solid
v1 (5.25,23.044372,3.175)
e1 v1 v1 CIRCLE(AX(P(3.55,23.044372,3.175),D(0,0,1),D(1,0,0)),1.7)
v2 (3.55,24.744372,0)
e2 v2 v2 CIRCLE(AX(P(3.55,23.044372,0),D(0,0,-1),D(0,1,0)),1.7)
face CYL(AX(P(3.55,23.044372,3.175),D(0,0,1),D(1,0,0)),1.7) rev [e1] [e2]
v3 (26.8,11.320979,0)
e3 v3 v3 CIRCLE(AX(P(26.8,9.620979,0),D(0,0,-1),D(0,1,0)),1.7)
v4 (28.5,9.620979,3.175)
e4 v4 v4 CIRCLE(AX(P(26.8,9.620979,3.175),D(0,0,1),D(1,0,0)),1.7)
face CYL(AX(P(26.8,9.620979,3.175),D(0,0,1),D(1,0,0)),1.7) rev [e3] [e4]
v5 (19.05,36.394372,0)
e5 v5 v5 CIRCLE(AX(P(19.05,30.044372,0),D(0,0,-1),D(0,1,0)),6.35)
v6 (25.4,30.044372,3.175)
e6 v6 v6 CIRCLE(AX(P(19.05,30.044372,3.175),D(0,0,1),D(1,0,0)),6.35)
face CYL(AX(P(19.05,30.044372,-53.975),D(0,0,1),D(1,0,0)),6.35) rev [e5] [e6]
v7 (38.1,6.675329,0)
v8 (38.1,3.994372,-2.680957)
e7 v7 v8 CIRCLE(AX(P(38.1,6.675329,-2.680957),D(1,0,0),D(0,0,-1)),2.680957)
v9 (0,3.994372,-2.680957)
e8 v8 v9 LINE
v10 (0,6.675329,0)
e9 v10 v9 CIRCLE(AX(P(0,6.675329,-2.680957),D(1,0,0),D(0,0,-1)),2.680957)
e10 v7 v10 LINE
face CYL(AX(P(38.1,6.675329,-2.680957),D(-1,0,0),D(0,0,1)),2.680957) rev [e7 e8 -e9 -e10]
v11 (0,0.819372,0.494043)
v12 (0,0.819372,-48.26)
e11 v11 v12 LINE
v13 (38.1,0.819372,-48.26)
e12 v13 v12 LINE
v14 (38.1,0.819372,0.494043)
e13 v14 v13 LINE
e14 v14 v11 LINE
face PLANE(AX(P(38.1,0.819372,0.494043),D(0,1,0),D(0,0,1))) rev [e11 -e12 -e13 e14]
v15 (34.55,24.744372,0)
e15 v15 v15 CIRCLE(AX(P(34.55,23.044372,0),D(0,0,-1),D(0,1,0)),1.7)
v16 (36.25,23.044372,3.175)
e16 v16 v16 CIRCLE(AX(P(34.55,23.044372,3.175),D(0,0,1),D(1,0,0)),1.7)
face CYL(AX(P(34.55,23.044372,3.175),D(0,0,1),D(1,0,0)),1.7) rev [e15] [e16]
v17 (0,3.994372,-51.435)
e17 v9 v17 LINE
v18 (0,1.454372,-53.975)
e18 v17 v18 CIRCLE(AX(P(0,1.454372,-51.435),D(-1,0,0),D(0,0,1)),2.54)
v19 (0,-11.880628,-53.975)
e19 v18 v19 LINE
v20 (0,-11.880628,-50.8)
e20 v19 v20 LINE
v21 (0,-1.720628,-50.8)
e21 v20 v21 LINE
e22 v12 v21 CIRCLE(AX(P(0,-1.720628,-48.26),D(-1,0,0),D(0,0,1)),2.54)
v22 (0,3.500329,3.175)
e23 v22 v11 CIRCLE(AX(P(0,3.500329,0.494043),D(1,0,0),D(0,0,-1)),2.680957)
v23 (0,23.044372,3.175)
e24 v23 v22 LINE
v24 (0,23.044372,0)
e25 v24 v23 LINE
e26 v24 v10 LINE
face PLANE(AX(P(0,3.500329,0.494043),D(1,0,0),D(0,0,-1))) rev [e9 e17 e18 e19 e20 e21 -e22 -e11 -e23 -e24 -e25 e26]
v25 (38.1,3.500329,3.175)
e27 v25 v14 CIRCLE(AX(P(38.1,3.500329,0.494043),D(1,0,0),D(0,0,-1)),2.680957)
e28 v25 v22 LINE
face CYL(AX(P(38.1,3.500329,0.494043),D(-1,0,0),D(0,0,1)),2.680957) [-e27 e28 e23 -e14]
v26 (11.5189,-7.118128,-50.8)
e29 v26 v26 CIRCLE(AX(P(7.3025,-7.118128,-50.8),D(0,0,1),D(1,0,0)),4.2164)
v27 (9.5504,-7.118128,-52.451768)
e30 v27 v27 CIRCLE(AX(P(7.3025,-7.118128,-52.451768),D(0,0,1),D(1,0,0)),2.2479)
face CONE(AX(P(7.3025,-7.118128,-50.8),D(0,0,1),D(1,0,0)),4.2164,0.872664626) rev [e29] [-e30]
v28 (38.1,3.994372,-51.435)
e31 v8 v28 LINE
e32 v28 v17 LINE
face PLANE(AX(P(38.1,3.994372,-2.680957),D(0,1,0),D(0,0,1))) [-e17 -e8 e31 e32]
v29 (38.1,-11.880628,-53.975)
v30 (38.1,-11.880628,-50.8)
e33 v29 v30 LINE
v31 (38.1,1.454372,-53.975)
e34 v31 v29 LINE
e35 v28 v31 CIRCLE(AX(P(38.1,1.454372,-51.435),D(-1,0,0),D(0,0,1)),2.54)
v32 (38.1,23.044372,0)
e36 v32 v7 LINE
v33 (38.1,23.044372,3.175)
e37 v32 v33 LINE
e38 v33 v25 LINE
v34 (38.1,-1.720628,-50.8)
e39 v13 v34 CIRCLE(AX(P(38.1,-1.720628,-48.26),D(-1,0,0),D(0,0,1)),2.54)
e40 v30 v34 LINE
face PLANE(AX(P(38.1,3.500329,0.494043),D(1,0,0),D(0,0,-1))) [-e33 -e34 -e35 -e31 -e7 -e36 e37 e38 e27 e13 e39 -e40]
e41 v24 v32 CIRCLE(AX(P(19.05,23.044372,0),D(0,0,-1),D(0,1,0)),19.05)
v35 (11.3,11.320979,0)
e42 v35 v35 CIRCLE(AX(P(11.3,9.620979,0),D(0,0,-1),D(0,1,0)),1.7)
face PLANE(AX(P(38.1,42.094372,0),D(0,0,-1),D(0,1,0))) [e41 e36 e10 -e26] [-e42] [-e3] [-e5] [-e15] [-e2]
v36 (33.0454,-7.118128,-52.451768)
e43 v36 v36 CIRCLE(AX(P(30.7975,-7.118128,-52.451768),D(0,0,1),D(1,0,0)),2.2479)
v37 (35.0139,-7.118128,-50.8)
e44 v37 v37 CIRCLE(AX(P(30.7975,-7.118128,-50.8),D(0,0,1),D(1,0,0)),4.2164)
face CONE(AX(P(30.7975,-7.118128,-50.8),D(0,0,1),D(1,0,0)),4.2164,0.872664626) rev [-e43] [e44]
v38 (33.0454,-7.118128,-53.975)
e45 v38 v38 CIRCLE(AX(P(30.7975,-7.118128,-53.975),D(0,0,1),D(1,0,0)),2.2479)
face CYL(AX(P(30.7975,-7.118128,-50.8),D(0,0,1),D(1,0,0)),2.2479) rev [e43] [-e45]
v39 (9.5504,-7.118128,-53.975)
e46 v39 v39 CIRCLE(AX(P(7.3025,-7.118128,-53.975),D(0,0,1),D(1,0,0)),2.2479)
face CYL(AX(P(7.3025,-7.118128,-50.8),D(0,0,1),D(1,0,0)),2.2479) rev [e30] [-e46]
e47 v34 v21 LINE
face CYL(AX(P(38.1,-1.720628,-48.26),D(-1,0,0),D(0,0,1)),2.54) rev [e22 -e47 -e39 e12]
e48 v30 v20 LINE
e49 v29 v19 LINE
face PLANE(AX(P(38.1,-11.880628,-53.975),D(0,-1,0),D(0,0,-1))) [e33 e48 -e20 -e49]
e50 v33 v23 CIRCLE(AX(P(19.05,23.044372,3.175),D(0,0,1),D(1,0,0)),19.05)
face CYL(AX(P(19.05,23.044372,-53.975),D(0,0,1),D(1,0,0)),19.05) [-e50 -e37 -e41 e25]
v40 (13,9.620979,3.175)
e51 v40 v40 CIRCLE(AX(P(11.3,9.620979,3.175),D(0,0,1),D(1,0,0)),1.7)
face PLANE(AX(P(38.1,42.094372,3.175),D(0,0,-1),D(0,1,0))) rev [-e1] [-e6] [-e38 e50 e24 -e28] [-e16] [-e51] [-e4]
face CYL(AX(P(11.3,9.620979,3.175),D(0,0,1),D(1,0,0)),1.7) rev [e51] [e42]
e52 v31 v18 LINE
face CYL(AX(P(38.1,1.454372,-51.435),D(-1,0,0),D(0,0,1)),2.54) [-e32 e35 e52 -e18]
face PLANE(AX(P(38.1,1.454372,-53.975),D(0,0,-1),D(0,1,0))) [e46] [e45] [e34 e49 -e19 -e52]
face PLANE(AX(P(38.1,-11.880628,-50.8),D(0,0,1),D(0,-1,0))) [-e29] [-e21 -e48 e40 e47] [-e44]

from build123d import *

# Parameters (mm, degrees)
BOSS_EXTRUDE1_DEPTH                       = 38.1
CSK_FOR_8_FLAT_HEAD_MACHINE_SCREW_2_COUNT = 2
CSK_FOR_8_FLAT_HEAD_MACHINE_SCREW_2_PITCH = 23.495
SKETCH11_R                                = 6.35
CUT_EXTRUDE1_DEPTH                        = 81.558479852
M3_CLEARANCE_HOLE1_D                      = 3.4


with BuildPart() as part:
    # Sketch1 → Boss-Extrude1 (new body)
    with BuildSketch(Plane(origin=(0, 0, 0), x_dir=(0, 0, -1), z_dir=(1, 0, 0))):
        with BuildLine():
            Line((0, 42.094372261), (0, 6.675328802))
            ThreePointArc((0, 6.675328802), (0.785233991, 4.779606252), (2.680956542, 3.994372261))
            Line((2.680956542, 3.994372261), (51.435, 3.994372261))
            ThreePointArc((51.435, 3.994372261), (53.231051224, 3.250423485), (53.975, 1.454372261))
            Line((53.975, 1.454372261), (53.975, -11.880627739))
            Line((53.975, -11.880627739), (50.8, -11.880627739))
            Line((50.8, -11.880627739), (50.8, -1.720627739))
            ThreePointArc((50.8, -1.720627739), (50.056051224, 0.075423485), (48.26, 0.819372261))
            Line((48.26, 0.819372261), (-0.494043458, 0.819372261))
            ThreePointArc((-0.494043458, 0.819372261), (-2.389766009, 1.604606252), (-3.175, 3.500328802))
            Line((-3.175, 3.500328802), (-3.175, 42.094372261))
            Line((-3.175, 42.094372261), (0, 42.094372261))
        make_face()
    extrude(amount=BOSS_EXTRUDE1_DEPTH)

    # Sketch10 → CSK for #8 Flat Head Machine Screw (100)2 (revolve, cut)
    with BuildSketch(Plane(origin=(7.3025, -7.118127739, -50.8), x_dir=(0, -1, 0), z_dir=(1, 0, 0))):
        Polygon((0, 0), (0, 3.175), (2.2479, 3.175), (2.2479, 1.651767624), (4.2164, 0), align=None)
    csk_for_8_flat_head_machine_screw_100 = revolve(axis=Axis((7.3025, -7.118127739, -44.45), (0, 0, -1)), mode=Mode.SUBTRACT)

    # CSK for _8 Flat Head Machine Screw _ 2: CSK for #8 Flat Head Machine Screw (100)2 ×2
    with Locations(*[(i * CSK_FOR_8_FLAT_HEAD_MACHINE_SCREW_2_PITCH, 0, 0) for i in range(1, CSK_FOR_8_FLAT_HEAD_MACHINE_SCREW_2_COUNT)]):
        add(csk_for_8_flat_head_machine_screw_100, mode=Mode.SUBTRACT)

    # Sketch11 → Cut-Extrude1 (cut, through all)
    with BuildSketch(Plane.XY.offset(3.175)):
        with BuildLine():
            Line((38.1, 42.094372261), (19.05, 42.094372261))
            ThreePointArc((19.05, 42.094372261), (32.520384182, 36.514756442), (38.1, 23.044372261))
            Line((38.1, 23.044372261), (38.1, 42.094372261))
        make_face()
        with BuildLine():
            Line((0, 42.094372261), (0, 23.044372261))
            ThreePointArc((0, 23.044372261), (5.579615818, 36.514756442), (19.05, 42.094372261))
            Line((19.05, 42.094372261), (0, 42.094372261))
        make_face()
        with Locations((19.05, 30.044372261)):
            Circle(SKETCH11_R)
    extrude(amount=-CUT_EXTRUDE1_DEPTH, mode=Mode.SUBTRACT)

    # M3 Clearance Hole1 (through all)
    with Locations(Plane.XY.offset(3.175)):
        with Locations((3.55, 23.044372261), (34.55, 23.044372261), (26.8, 9.620978502), (11.3, 9.620978502)):
            Hole(M3_CLEARANCE_HOLE1_D / 2)


solid = part.part
